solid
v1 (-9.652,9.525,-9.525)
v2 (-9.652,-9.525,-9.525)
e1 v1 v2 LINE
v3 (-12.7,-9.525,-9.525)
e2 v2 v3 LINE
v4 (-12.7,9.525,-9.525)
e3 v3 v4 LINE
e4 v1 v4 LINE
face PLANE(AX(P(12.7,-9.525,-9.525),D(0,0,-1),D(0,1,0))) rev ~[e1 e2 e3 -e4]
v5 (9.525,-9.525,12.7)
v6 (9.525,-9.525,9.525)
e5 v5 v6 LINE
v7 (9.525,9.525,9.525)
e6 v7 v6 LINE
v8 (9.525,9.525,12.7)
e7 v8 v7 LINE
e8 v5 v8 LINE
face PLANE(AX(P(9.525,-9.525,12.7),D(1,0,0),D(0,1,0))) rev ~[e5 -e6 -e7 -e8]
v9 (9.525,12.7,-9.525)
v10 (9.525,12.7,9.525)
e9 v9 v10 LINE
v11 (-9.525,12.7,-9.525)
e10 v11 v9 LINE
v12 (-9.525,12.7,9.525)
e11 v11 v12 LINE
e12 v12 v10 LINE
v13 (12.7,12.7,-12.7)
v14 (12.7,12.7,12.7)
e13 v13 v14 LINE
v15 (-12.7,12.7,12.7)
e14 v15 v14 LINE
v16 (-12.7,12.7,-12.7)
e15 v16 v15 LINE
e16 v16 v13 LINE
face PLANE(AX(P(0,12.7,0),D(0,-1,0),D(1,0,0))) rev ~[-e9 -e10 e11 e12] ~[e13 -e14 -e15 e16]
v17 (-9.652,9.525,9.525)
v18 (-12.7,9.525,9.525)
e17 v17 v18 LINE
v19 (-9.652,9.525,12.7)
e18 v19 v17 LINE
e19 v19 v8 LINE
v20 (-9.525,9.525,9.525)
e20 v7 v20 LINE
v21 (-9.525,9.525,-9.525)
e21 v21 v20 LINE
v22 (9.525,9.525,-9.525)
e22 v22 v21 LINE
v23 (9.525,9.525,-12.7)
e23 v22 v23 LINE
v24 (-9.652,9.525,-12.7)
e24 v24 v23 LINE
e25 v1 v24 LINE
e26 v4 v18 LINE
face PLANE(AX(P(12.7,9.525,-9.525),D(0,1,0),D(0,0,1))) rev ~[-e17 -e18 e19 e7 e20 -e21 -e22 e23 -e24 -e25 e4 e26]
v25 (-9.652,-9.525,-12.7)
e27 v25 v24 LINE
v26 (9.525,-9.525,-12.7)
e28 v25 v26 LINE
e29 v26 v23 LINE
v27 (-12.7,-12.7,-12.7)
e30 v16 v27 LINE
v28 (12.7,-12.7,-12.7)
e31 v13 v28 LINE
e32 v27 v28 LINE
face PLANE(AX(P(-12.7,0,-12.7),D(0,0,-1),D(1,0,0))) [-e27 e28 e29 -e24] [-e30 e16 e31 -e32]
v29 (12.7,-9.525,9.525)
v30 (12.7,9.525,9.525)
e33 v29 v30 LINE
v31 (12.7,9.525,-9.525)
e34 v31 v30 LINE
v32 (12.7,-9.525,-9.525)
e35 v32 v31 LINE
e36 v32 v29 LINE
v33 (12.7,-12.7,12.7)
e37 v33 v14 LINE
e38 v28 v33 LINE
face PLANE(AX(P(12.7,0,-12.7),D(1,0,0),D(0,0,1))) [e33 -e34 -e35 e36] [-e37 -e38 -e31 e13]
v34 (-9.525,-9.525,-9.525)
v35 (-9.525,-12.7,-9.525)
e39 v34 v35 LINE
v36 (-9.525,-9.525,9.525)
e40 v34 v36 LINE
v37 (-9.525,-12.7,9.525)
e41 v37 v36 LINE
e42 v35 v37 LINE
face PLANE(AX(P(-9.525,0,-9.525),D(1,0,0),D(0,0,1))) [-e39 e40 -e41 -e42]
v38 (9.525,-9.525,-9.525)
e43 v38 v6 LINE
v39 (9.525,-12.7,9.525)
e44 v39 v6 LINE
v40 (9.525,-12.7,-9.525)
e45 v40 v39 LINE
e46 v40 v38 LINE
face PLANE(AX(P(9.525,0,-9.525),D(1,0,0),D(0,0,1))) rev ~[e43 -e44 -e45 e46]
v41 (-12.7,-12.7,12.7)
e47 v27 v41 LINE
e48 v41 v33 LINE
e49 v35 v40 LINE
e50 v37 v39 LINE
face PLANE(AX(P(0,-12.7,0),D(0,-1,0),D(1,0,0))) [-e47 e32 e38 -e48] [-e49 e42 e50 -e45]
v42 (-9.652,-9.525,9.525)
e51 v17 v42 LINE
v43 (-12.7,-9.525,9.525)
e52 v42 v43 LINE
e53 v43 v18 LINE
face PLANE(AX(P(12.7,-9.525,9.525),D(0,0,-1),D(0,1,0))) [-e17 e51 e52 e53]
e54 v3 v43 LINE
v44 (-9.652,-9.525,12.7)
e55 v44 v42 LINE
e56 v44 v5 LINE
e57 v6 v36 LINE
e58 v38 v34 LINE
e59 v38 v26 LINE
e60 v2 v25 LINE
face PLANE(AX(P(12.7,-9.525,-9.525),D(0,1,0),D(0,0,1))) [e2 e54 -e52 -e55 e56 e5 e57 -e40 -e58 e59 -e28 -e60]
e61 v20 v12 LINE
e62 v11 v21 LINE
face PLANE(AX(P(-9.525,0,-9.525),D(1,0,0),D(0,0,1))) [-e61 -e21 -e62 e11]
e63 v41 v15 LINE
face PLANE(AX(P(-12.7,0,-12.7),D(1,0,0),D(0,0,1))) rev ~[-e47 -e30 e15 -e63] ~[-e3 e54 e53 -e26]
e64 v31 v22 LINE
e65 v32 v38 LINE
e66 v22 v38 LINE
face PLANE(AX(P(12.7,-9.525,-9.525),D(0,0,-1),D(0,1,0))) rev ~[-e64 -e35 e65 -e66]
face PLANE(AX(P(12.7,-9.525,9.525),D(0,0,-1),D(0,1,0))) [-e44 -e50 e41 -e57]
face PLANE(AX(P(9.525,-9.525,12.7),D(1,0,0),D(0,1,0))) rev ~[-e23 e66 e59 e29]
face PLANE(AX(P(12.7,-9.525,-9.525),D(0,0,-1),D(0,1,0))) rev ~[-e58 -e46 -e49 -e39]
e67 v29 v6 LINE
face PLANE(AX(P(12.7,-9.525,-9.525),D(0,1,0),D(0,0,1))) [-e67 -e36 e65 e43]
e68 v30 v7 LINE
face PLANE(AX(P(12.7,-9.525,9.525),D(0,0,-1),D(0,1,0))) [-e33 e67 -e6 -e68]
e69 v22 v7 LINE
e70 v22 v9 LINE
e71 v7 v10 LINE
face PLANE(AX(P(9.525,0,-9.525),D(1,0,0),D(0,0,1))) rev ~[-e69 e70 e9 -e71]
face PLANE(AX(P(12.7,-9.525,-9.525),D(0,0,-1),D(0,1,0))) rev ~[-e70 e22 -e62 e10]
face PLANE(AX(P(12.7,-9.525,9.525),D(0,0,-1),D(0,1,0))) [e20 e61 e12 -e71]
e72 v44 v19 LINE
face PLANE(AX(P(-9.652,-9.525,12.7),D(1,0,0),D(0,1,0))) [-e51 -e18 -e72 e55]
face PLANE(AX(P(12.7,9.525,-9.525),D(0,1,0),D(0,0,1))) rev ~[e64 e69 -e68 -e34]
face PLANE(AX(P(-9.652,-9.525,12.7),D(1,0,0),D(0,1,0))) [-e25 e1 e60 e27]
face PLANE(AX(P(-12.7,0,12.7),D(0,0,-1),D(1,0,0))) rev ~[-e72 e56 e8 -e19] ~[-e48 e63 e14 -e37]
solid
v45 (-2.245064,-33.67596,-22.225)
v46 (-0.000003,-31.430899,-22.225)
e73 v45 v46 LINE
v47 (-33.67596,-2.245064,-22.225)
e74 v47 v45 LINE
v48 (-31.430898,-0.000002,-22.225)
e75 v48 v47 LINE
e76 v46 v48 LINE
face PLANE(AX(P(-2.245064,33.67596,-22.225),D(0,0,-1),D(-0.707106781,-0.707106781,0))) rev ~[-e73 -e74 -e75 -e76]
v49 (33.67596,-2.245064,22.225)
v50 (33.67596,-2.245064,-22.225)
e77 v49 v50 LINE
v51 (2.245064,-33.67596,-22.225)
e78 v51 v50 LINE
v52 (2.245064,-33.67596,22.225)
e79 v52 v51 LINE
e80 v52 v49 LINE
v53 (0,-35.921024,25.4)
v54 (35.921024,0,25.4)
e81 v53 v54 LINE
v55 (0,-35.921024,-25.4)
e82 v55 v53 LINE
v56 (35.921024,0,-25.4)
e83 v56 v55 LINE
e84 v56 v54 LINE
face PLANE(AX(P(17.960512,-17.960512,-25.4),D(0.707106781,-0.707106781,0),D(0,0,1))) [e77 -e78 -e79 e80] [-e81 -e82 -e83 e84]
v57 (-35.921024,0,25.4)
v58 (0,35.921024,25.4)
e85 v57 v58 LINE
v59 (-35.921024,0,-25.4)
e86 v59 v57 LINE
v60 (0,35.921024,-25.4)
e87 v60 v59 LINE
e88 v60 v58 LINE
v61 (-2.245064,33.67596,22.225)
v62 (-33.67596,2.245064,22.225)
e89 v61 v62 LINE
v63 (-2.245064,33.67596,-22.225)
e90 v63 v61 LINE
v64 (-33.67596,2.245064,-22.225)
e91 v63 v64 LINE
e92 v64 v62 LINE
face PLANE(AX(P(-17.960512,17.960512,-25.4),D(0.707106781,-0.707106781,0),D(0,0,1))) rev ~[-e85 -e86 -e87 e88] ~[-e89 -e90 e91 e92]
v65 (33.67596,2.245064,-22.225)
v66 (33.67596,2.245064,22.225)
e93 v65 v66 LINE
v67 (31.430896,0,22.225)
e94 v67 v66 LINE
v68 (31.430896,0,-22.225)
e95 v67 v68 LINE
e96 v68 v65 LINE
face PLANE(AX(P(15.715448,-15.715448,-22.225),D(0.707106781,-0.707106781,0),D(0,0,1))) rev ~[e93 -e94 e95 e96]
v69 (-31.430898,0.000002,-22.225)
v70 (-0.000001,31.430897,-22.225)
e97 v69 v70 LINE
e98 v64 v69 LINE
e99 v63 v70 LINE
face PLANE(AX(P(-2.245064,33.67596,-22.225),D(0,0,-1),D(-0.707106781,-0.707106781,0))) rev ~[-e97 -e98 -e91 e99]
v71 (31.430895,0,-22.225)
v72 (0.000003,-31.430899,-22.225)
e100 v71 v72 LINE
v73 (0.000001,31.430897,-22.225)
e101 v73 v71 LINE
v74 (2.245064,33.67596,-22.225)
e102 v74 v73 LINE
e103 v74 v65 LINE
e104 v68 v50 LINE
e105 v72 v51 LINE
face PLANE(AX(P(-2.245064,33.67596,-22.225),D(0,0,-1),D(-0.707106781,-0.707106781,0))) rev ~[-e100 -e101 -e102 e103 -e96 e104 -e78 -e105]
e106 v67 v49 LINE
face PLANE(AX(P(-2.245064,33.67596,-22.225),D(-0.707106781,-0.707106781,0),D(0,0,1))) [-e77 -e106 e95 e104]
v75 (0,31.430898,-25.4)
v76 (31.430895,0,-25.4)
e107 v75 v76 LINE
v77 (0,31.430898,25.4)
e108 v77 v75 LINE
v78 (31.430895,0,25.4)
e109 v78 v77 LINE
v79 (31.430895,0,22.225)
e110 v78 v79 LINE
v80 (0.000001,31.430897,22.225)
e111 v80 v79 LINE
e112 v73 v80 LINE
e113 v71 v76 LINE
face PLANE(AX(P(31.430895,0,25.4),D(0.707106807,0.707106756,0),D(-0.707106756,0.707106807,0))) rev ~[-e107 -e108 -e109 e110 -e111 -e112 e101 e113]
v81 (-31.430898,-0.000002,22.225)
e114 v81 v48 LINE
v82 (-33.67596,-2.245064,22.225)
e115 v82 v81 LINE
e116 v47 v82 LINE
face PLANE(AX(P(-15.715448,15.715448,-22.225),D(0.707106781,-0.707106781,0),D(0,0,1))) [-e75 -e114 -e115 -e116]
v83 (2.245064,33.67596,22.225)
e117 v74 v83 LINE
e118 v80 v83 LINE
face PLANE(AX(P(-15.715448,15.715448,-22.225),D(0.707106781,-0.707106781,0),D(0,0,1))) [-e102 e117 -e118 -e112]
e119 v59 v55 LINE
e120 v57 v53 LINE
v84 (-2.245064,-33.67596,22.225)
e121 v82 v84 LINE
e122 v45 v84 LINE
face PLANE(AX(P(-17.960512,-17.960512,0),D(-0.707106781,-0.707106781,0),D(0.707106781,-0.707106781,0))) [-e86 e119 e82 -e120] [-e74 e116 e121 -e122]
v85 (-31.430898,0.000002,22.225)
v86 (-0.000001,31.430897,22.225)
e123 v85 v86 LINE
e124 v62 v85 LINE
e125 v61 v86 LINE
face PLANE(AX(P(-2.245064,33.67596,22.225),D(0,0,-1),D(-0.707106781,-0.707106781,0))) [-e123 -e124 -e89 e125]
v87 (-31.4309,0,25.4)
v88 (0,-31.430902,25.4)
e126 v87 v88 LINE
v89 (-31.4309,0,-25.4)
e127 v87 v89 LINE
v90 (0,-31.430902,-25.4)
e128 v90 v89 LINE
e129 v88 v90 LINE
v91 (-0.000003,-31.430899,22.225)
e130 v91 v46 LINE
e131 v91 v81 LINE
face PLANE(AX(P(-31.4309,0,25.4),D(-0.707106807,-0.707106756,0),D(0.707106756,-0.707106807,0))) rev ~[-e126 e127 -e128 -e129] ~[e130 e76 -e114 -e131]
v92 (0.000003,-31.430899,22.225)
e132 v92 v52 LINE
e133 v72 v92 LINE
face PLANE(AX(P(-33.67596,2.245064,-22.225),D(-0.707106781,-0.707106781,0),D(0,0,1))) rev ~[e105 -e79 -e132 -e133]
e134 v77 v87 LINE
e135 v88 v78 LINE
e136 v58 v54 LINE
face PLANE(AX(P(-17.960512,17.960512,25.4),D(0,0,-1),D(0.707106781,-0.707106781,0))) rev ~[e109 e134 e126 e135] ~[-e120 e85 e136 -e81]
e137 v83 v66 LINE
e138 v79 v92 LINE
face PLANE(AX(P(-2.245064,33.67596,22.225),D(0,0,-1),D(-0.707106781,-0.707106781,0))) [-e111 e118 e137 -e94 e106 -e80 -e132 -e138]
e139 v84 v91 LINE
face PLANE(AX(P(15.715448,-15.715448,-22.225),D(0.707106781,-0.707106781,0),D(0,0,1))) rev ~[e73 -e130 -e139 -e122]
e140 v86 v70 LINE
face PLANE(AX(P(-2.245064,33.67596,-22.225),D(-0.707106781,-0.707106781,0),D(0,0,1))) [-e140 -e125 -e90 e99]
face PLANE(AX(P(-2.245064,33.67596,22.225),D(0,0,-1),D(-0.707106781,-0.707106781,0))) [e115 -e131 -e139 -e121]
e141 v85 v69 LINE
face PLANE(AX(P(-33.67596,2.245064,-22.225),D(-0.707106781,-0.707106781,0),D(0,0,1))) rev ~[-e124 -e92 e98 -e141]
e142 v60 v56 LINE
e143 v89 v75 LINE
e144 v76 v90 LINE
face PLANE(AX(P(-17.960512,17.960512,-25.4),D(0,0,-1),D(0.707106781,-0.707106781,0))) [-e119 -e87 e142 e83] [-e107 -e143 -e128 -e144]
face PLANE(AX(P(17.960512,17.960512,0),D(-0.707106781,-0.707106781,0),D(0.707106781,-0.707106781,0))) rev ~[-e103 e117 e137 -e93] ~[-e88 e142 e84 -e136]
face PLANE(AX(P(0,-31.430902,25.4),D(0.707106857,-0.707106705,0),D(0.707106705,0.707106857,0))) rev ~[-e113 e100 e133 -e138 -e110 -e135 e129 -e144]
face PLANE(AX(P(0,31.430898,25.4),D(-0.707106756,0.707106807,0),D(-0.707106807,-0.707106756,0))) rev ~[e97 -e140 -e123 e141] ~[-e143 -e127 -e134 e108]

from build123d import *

# Parameters (mm, degrees)
F0_W      = 25.4
F0_H      = 25.4
F0_W_2    = 19.05
F0_H_2    = 19.05
F1_DEPTH  = 12.7
F2_W      = 19.05
F2_H      = 19.05
F3_DEPTH  = 25.4
F4_W      = 19.177
F4_H      = 19.05
F5_DEPTH  = 25.4
F7_W      = 50.8
F7_H      = 50.8
F7_W_2    = 44.45
F7_H_2    = 44.45
F8_DEPTH  = 25.4
F9_W      = 44.45
F9_H      = 44.45
F10_DEPTH = 76.201
F12_DEPTH = 50.801


with BuildPart() as f1:
    # F0 (on Front) → F1 (new body, symmetric)
    with BuildSketch(Plane.XZ):
        Rectangle(F0_W, F0_H)
        Rectangle(F0_W_2, F0_H_2, mode=Mode.SUBTRACT)
    extrude(amount=F1_DEPTH, both=True)

    # F2 (on face) → F3 (cut)
    with BuildSketch(Plane.YZ.offset(12.7)):
        Rectangle(F2_W, F2_H)
    extrude(amount=-F3_DEPTH, mode=Mode.SUBTRACT)

    # F4 (on face) → F5 (cut, through all)
    with BuildSketch(Plane.XY.offset(12.7)):
        with Locations((-0.0635, 0)):
            Rectangle(F4_W, F4_H)
    extrude(amount=-F5_DEPTH, mode=Mode.SUBTRACT)


with BuildPart() as f8:
    # F7 (on face) → F8 (new body, symmetric)
    with BuildSketch(Plane(origin=(0, 0, 0), x_dir=(0.7071067812, -0.7071067812, 0), z_dir=(-0.7071067812, -0.7071067812, 0))):
        Rectangle(F7_W, F7_H)
        Rectangle(F7_W_2, F7_H_2, mode=Mode.SUBTRACT)
    extrude(amount=F8_DEPTH, both=True)

    # F9 (on face) → F10 (cut, through all)
    with BuildSketch(Plane(origin=(-17.9605122421, 17.9605122421, 0), x_dir=(-0.7071067812, -0.7071067812, 0), z_dir=(-0.7071067812, 0.7071067812, 0))):
        Rectangle(F9_W, F9_H)
    extrude(amount=-F10_DEPTH, mode=Mode.SUBTRACT)

    # F11 (on face) → F12 (cut, through all)
    with BuildSketch(Plane.XY.offset(25.4)):
        Polygon((31.4308952947, 0), (0, 31.4308975528), (-31.430899811, 0), (0, -31.4309020691), align=None)
    extrude(amount=-F12_DEPTH, mode=Mode.SUBTRACT)


solid = Compound([f1.part, f8.part])
